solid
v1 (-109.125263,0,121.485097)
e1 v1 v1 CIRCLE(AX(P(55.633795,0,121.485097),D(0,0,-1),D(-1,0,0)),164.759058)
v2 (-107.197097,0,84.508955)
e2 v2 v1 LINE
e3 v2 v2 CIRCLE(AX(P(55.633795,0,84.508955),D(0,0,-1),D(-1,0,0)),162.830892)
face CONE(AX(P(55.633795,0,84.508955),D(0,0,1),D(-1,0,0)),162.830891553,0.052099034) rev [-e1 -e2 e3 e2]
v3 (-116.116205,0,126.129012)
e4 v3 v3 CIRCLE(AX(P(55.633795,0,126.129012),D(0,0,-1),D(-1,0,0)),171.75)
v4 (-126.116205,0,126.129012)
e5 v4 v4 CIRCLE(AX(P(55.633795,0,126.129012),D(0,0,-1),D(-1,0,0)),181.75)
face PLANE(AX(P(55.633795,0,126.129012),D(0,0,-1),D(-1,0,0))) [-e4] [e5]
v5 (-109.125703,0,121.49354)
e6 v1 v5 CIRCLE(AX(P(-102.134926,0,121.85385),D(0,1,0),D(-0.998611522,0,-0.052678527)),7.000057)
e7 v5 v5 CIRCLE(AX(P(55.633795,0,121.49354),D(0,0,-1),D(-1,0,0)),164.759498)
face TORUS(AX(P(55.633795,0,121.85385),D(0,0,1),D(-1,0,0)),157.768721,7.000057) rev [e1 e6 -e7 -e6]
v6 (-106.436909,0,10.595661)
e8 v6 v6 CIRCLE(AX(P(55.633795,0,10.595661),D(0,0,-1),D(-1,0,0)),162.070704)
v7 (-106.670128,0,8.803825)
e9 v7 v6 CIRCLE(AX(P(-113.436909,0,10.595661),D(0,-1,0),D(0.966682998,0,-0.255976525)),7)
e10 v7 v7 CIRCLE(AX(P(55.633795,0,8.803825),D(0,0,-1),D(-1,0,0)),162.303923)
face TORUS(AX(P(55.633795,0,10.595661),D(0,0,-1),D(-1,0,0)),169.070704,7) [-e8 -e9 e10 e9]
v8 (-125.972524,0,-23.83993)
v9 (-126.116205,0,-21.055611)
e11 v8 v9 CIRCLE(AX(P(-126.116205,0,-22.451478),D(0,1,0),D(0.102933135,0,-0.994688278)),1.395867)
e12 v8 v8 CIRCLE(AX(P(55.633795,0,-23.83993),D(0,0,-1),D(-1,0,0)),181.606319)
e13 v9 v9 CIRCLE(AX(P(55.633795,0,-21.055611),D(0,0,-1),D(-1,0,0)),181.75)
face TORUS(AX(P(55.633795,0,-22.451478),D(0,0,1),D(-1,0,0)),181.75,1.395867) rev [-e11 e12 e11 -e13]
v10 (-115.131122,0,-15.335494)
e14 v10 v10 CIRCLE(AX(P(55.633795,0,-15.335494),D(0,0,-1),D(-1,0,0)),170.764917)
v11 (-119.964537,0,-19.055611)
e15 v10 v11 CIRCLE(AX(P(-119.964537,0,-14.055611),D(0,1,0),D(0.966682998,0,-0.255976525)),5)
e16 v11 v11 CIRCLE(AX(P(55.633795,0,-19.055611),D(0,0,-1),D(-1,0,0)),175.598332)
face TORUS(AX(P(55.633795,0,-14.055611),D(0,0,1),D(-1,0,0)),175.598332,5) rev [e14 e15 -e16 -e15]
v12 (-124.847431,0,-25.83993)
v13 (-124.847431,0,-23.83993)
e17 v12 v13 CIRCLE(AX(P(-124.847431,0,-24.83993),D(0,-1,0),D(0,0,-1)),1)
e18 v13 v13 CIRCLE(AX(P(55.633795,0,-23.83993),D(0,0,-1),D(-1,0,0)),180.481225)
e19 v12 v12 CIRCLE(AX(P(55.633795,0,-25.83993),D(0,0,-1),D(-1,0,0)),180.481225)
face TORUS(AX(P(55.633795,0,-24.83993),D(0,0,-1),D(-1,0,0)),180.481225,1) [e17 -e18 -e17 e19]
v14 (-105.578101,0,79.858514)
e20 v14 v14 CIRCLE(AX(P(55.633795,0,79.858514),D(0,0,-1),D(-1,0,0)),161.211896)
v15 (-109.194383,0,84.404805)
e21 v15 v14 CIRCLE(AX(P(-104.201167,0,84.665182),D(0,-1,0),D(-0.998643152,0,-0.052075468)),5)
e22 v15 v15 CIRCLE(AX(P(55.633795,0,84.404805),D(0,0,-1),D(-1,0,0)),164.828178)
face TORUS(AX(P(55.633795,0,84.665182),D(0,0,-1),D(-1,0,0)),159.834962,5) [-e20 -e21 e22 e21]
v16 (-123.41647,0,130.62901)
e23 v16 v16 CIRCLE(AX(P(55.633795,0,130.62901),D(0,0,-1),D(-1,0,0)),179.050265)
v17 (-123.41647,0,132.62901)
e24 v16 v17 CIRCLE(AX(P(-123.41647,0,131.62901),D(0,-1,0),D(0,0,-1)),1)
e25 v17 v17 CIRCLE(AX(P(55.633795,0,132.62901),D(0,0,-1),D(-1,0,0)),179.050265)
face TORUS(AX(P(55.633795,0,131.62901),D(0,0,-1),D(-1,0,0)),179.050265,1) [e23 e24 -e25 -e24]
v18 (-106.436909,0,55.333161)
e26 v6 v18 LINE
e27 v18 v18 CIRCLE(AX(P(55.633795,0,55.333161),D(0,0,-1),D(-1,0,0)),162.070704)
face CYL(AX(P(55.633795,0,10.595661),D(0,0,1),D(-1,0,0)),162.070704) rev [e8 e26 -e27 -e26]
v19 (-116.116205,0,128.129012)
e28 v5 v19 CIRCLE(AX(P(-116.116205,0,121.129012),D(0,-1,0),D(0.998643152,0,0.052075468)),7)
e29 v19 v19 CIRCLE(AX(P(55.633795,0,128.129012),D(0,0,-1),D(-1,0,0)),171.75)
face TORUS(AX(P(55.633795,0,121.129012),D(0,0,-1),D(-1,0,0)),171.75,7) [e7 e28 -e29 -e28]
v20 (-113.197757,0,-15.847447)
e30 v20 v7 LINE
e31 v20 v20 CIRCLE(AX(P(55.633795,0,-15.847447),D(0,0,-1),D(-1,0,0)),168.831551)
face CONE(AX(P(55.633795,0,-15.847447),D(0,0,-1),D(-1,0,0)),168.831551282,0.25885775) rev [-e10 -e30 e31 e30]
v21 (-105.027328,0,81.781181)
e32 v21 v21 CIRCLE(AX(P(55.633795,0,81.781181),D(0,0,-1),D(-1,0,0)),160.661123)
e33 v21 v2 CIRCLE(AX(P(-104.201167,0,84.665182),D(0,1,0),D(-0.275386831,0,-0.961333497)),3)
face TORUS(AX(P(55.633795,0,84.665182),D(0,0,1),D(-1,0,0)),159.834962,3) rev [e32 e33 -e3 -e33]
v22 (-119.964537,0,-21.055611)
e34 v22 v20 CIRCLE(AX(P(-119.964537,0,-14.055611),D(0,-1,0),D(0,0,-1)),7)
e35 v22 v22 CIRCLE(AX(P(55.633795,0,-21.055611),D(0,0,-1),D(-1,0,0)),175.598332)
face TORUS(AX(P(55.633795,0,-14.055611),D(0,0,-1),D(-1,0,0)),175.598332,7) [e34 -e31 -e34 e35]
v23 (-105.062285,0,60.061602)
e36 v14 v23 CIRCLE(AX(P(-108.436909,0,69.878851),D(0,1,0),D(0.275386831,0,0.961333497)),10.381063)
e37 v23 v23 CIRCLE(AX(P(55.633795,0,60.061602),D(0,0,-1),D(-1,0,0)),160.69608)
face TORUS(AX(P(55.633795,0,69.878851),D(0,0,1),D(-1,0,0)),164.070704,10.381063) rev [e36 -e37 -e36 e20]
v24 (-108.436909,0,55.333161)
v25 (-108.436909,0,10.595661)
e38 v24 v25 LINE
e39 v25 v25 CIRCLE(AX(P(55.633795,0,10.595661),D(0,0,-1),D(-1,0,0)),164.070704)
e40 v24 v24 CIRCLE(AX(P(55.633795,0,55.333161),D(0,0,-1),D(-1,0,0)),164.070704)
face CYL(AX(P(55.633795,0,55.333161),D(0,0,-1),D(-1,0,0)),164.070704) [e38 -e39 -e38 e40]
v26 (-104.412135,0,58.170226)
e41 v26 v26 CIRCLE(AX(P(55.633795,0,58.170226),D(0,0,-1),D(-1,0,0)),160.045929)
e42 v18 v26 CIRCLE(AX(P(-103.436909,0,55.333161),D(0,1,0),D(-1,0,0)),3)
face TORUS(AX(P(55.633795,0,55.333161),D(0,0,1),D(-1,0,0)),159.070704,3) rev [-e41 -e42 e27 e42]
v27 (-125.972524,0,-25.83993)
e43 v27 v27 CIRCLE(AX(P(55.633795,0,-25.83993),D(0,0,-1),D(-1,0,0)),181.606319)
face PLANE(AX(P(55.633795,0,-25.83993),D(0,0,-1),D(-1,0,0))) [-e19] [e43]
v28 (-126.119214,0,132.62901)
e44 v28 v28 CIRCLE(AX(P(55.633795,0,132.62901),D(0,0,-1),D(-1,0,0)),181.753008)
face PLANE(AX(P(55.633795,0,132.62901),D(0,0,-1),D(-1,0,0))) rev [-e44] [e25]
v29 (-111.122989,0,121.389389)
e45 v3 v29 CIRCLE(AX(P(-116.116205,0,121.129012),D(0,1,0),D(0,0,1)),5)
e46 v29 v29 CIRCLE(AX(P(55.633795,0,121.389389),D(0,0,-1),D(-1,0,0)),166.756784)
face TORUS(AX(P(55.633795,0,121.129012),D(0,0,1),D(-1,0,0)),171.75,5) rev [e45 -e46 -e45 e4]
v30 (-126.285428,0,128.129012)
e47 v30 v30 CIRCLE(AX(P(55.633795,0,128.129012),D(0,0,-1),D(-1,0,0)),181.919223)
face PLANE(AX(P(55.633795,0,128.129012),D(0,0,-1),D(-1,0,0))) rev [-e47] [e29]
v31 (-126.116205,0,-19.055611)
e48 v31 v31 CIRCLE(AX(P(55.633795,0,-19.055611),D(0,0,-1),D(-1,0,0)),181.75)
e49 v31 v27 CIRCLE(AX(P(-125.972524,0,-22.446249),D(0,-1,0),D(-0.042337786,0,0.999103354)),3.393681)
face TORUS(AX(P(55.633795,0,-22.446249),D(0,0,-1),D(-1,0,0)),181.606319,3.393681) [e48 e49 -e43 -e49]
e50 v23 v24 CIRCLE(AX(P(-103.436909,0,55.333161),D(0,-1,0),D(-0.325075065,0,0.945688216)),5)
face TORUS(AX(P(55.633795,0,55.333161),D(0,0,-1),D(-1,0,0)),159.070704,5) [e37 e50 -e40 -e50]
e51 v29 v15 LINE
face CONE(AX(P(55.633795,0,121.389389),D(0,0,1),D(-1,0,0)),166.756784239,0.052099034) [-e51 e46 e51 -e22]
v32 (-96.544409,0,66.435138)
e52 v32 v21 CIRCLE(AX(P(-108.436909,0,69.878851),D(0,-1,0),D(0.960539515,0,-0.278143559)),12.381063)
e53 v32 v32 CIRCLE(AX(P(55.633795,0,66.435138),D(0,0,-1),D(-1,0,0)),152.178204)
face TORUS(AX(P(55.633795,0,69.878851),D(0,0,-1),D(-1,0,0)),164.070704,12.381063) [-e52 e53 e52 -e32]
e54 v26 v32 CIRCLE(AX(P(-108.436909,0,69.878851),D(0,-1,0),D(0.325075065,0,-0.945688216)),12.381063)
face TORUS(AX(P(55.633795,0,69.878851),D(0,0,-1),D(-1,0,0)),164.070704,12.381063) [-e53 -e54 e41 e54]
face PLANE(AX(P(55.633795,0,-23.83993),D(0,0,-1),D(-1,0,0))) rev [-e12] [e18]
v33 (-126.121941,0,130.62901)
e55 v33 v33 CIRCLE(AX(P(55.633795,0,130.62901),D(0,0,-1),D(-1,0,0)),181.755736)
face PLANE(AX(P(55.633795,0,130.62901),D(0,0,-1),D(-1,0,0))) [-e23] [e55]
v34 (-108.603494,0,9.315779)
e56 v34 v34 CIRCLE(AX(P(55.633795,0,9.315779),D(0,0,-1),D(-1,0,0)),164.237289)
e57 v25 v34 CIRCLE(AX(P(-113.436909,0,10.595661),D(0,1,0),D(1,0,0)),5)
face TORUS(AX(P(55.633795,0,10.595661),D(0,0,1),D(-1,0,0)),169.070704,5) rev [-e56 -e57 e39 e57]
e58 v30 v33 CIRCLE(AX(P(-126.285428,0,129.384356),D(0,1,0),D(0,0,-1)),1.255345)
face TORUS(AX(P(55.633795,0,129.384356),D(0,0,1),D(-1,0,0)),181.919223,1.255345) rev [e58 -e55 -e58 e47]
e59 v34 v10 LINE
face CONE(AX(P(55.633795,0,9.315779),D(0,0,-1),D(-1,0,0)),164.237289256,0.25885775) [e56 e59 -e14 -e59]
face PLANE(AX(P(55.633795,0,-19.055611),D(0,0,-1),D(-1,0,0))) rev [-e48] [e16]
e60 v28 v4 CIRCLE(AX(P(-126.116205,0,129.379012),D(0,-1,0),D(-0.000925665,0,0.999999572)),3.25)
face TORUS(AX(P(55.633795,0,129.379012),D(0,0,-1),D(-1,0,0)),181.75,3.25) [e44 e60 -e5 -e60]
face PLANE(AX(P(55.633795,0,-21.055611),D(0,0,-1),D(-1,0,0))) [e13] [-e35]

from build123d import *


# Not quite as in the source:
# - ends of sketch curves that miss each other by under 0.0002 mm in the source are joined


with BuildPart() as f1:
    # F0 (on Front) → F1 (revolve)
    with BuildSketch(Plane.XZ):
        with BuildLine():
            Line((-119.9645374891, -19.0556111847), (-126.1162052209, -19.0556111847))
            ThreePointArc((-126.1162052209, -19.0556111847), (-129.365444403, -22.5181057669), (-125.9725242853, -25.8399301254))
            Line((-125.9725242853, -25.8399301254), (-124.8474305217, -25.8399301254))
            ThreePointArc((-124.8474305217, -25.8399301254), (-123.8474305217, -24.8399301254), (-124.8474305217, -23.8399301254))
            Line((-124.8474305217, -23.8399301254), (-125.9725242853, -23.8399301254))
            ThreePointArc((-125.9725242853, -23.8399301254), (-127.510217073, -22.5234139406), (-126.1162052209, -21.0556111847))
            Line((-126.1162052209, -21.0556111847), (-119.9645374891, -21.0556111847))
            ThreePointArc((-119.9645374891, -21.0556111847), (-115.6950439438, -19.6028109167), (-113.1977565033, -15.8474468608))
            Line((-113.1977565033, -15.8474468608), (-106.6701284805, 8.8038254501))
            ThreePointArc((-106.6701284805, 8.8038254501), (-106.4954590811, 9.6921864172), (-106.4369094663, 10.5956611262))
            Line((-106.4369094663, 10.5956611262), (-106.4369094663, 55.3331610558))
            ThreePointArc((-106.4369094663, 55.3331610558), (-105.8788017228, 57.0759066503), (-104.4121346614, 58.1702257041))
            ThreePointArc((-104.4121346614, 58.1702257041), (-99.4693510462, 61.3422466364), (-96.5444093761, 66.4351380438))
            ThreePointArc((-96.5444093761, 66.4351380438), (-97.6011497884, 75.8685945768), (-105.02732781, 81.7811813584))
            ThreePointArc((-105.02732781, 81.7811813584), (-106.5489920048, 82.7976382138), (-107.197096774, 84.5089554458))
            Line((-107.197096774, 84.5089554458), (-109.1252628864, 121.4850969167))
            ThreePointArc((-109.1252628864, 121.4850969167), (-109.1254842953, 121.4893183303), (-109.125703155, 121.4935398784))
            ThreePointArc((-109.125703155, 121.4935398784), (-111.2970609996, 126.2060037188), (-116.1162052209, 128.1290116))
            Line((-116.1162052209, 128.1290116), (-126.2854278027, 128.1290116))
            ThreePointArc((-126.2854278027, 128.1290116), (-127.5380970484, 129.4662744669), (-126.1219410502, 130.6290102076))
            Line((-126.1219410502, 130.6290102076), (-123.4164699041, 130.6290102076))
            ThreePointArc((-123.4164699041, 130.6290102076), (-122.4164699041, 131.6290102076), (-123.4164699041, 132.6290102076))
            Line((-123.4164699041, 132.6290102076), (-126.1192136336, 132.6290102076))
            ThreePointArc((-126.1192136336, 132.6290102076), (-129.3662048728, 129.3775073935), (-126.1162052209, 126.1290116))
            Line((-126.1162052209, 126.1290116), (-116.1162052209, 126.1290116))
            ThreePointArc((-116.1162052209, 126.1290116), (-112.6739593486, 124.755434542), (-111.1229894595, 121.3893889417))
            Line((-111.1229894595, 121.3893889417), (-109.1943830786, 84.4048045091))
            ThreePointArc((-109.1943830786, 84.4048045091), (-108.1142084632, 81.5526091224), (-105.5781014718, 79.8585143635))
            ThreePointArc((-105.5781014718, 79.8585143635), (-98.0593686139, 70.1492420154), (-105.0622847915, 60.0616021363))
            ThreePointArc((-105.0622847915, 60.0616021363), (-107.5067298939, 58.2377370467), (-108.4369094663, 55.3331610558))
            Line((-108.4369094663, 55.3331610558), (-108.4369094663, 10.5956611262))
            ThreePointArc((-108.4369094663, 10.5956611262), (-108.4787306197, 9.9503220484), (-108.6034944764, 9.3157785004))
            Line((-108.6034944764, 9.3157785004), (-115.1311224993, -15.3354938105))
            ThreePointArc((-115.1311224993, -15.3354938105), (-116.9148992425, -18.0178967075), (-119.9645374891, -19.0556111847))
        make_face()
    revolve(axis=Axis((55.6337947791, 0, 51.8589288074), (0, 0, -1)))


solid = f1.part
